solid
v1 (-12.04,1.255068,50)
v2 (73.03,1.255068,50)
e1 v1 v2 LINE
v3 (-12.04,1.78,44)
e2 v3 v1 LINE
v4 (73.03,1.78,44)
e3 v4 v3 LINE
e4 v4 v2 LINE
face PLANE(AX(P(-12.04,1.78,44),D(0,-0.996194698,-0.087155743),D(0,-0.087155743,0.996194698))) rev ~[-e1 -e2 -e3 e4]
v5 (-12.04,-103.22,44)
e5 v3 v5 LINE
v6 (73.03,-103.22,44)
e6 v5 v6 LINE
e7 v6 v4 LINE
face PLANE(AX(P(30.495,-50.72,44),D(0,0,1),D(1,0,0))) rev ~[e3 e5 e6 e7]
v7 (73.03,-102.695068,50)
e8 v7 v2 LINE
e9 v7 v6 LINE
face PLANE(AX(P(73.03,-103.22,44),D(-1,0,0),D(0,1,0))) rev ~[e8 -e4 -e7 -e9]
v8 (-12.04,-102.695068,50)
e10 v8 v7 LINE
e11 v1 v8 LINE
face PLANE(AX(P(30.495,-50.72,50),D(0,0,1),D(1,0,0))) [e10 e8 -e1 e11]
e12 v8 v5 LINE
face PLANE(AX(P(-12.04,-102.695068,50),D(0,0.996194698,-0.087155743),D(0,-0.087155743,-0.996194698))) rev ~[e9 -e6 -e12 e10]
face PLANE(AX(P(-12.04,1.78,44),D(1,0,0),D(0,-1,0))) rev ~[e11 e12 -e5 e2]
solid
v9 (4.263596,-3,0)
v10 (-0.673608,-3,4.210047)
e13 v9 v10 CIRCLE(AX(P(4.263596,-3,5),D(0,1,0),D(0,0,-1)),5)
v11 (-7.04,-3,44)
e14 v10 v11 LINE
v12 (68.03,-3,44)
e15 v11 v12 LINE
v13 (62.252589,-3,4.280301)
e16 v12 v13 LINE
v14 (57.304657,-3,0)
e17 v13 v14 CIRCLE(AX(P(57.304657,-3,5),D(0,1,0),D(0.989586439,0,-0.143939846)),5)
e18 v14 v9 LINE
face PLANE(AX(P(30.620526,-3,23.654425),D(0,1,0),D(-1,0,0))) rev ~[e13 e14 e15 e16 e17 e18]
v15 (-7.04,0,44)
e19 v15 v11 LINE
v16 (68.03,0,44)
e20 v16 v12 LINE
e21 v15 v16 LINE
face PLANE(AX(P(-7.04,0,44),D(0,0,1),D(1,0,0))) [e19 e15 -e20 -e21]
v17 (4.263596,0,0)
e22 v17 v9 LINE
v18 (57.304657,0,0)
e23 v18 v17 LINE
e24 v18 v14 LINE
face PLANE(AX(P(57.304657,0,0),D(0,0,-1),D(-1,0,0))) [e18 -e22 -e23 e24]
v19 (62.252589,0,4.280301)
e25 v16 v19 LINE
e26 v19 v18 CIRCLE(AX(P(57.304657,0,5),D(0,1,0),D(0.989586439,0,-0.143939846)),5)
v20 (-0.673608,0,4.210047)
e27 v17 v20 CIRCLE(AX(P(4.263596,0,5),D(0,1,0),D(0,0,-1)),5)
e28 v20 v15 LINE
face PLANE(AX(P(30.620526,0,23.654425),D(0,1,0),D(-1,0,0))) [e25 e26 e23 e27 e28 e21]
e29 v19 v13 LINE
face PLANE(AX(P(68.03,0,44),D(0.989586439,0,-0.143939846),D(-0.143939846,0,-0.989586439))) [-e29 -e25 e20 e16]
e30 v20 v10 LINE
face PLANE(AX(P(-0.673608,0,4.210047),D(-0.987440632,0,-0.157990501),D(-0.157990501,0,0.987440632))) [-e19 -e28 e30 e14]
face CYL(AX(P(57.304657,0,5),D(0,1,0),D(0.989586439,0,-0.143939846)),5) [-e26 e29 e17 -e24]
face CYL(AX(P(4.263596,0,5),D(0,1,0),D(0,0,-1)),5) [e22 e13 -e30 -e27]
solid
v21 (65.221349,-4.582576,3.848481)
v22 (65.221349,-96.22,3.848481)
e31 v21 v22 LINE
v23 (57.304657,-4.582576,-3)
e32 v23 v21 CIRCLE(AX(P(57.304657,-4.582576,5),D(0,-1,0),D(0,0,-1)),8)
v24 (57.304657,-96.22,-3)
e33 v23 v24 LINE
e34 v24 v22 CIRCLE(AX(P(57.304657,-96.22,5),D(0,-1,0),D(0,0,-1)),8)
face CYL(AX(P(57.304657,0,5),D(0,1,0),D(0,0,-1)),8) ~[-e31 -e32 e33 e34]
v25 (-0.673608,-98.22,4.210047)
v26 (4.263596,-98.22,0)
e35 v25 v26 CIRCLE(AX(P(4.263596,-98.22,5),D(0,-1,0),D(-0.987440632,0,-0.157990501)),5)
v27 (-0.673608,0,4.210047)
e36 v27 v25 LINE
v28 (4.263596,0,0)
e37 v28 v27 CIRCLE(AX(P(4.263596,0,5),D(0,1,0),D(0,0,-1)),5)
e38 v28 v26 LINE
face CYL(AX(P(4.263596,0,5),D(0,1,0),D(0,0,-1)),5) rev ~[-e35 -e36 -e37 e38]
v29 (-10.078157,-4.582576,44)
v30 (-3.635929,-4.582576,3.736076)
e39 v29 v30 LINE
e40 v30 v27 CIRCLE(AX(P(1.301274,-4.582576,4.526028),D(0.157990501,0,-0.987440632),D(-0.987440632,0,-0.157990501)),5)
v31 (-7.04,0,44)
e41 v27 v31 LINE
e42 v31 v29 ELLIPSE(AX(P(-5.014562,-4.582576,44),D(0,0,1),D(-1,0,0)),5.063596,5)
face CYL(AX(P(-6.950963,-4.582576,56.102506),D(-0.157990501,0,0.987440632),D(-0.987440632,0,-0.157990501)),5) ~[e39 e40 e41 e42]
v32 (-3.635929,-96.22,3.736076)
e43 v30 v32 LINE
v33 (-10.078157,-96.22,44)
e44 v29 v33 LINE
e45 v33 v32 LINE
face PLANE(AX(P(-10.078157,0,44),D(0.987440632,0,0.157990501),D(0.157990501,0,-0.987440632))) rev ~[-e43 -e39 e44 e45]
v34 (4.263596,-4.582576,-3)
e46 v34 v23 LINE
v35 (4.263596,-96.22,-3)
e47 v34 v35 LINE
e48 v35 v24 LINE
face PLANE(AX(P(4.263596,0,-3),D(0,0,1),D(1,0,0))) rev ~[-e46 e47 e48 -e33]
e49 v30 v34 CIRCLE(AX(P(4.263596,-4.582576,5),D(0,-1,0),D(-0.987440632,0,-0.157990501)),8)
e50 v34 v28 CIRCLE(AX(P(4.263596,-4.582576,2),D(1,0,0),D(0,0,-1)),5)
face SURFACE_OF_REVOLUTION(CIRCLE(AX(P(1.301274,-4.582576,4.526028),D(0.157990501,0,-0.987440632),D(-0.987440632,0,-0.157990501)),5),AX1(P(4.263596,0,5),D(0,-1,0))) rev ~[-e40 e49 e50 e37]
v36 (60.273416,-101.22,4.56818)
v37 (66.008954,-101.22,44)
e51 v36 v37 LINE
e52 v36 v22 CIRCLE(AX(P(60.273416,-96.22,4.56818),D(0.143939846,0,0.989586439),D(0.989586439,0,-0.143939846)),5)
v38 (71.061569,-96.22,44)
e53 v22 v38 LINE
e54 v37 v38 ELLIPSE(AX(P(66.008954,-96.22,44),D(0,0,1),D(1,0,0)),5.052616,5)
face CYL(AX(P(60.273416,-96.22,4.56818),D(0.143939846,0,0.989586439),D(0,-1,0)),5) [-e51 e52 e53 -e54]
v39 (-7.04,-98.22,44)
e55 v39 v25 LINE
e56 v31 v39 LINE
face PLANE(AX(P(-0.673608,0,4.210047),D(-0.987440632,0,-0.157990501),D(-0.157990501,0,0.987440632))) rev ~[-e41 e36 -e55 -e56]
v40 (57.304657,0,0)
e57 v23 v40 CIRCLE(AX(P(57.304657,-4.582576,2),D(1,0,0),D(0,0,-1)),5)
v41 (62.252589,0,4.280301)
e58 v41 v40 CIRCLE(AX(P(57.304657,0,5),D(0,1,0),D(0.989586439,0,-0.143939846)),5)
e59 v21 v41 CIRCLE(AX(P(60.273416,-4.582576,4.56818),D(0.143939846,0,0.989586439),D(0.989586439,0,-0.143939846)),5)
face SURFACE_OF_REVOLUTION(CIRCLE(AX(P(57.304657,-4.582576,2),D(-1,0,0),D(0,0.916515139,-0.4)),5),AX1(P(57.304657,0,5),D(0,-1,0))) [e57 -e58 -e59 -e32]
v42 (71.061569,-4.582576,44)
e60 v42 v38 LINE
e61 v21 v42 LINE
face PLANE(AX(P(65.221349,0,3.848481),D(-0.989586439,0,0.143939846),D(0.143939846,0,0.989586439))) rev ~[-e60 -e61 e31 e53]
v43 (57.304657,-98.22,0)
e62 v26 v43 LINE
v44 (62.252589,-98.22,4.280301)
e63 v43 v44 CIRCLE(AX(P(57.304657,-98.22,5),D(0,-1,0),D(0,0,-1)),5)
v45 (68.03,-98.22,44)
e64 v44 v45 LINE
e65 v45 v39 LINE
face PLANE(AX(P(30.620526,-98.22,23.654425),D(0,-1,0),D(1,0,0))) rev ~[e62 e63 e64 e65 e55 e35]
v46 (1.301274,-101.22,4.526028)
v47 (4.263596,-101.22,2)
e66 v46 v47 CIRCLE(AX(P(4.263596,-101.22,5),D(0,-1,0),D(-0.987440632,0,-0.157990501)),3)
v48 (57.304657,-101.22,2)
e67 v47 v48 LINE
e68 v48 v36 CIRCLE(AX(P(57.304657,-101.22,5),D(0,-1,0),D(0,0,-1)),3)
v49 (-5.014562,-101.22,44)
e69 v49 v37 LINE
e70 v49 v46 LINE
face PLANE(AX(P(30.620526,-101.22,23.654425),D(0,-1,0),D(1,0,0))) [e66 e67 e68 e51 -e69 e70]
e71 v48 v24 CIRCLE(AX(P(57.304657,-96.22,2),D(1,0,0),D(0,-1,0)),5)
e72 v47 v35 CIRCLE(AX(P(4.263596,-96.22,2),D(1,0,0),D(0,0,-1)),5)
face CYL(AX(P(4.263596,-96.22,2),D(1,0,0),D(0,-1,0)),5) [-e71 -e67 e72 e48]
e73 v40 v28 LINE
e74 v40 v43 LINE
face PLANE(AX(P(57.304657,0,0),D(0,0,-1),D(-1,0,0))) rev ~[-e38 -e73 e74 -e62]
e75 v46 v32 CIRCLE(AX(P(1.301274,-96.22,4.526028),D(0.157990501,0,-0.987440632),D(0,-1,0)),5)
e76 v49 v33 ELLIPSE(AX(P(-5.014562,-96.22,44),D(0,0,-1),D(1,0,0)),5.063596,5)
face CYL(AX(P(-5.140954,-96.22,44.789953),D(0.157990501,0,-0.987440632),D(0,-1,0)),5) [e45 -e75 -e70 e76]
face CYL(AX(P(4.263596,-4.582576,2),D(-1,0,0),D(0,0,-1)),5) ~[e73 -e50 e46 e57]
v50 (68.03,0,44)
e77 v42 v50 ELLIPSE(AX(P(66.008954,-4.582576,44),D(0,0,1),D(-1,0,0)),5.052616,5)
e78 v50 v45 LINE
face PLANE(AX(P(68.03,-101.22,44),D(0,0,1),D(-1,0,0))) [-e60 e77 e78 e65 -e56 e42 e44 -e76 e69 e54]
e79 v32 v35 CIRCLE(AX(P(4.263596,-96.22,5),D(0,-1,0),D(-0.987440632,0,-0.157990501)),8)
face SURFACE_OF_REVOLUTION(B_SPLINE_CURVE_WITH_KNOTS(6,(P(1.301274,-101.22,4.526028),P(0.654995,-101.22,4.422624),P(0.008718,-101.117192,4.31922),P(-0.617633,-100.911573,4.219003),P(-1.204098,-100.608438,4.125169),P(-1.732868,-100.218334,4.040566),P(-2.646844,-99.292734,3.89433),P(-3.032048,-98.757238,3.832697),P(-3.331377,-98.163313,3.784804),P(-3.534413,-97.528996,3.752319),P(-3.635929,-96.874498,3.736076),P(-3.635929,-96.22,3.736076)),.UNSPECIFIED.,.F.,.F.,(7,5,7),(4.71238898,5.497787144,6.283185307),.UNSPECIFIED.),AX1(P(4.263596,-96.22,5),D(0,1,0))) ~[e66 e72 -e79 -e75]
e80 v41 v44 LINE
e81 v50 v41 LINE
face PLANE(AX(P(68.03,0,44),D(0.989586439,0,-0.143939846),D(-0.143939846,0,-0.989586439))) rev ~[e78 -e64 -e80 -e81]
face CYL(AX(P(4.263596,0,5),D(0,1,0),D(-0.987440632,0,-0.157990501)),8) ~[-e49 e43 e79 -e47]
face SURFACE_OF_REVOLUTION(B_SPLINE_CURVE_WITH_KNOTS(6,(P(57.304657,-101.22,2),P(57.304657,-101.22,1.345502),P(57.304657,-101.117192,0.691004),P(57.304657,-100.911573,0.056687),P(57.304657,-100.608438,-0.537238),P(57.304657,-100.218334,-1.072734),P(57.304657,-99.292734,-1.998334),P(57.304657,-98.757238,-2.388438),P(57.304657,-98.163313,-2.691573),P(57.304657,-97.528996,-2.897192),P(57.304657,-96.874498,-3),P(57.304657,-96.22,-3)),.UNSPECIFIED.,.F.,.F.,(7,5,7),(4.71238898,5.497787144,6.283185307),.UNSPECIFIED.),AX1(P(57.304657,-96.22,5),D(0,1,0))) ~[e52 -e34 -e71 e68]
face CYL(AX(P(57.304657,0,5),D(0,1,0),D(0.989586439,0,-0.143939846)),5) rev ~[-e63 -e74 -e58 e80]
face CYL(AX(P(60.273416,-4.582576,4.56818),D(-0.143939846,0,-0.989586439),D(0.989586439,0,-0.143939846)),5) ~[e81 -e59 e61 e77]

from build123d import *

# Parameters (mm, degrees)
F1_DEPTH     = 101.22
F3_DEPTH     = 3
F5_DEPTH     = 3
F6_T1_DEPTH  = 52.0304782215
F6_T3_DEPTH  = 53.0410614462
F6_T5_DEPTH  = 52.232484609
F6_T8_ANGLE  = 81.7241071729
F6_T10_ANGLE = 80.9097230792
F7_R         = 5
F9_DEPTH     = 6
F11_DEPTH    = 111.14


# Not quite as in the source:
# - a fillet or chamfer that OpenCascade refuses, or shapes differently, is made with other operations: its cross-section is extruded or revolved along the edge and cut away or added


with BuildPart() as f1:
    # F0 (on Front) → F1 (new body)
    with BuildSketch(Plane.XZ):
        with BuildLine():
            Line((57.3046570067, 0), (4.2635955605, 0))
            ThreePointArc((4.2635955605, 0), (1.0193516214, 1.1954131284), (-0.6736075991, 4.2100474945))
            Line((-0.6736075991, 4.2100474945), (-7.04, 44))
            Line((-7.04, 44), (-10.0781573363, 44))
            Line((-10.0781573363, 44), (-3.6359294949, 3.7360759911))
            ThreePointArc((-3.6359294949, 3.7360759911), (-0.927194742, -1.0873389946), (4.2635955605, -3))
            Line((4.2635955605, -3), (57.3046570067, -3))
            ThreePointArc((57.3046570067, -3), (62.5385776153, -1.0502954525), (65.221348521, 3.8484812343))
            Line((65.221348521, 3.8484812343), (71.0615694323, 44))
            Line((71.0615694323, 44), (68.03, 44))
            Line((68.03, 44), (62.2525892031, 4.2803007714))
            ThreePointArc((62.2525892031, 4.2803007714), (60.5758573871, 1.2185653422), (57.3046570067, 0))
        make_face()
    extrude(amount=F1_DEPTH)

    # F2 (on face) → F3 (join)
    with BuildSketch(Plane.XZ.offset(101.22)):
        with BuildLine():
            Line((68.03, 44), (-7.04, 44))
            Line((-7.04, 44), (-0.6736075991, 4.2100474945))
            ThreePointArc((-0.6736075991, 4.2100474945), (1.0193516214, 1.1954131284), (4.2635955605, 0))
            Line((4.2635955605, 0), (57.3046570067, 0))
            ThreePointArc((57.3046570067, 0), (60.5758573871, 1.2185653422), (62.2525892031, 4.2803007714))
            Line((62.2525892031, 4.2803007714), (68.03, 44))
        make_face()
    extrude(amount=-F3_DEPTH)

    # F6: fillet of radius 5 on 1 edges, made by hand

    # F6_s2 → F6_t1 (cut)
    with BuildSketch(Plane(origin=(1.8994814012, 0, 13.0589346335), x_dir=(0, 1, 0), z_dir=(0.1439398457, 0, 0.9895864393))):
        with BuildLine():
            ThreePointArc((-4.582575695, -63.9882122531), (-1.8439629074, -63.1715123858), (0, -60.9882122531))
            Line((0, -60.9882122531), (0, -63.9882122531))
            Line((0, -63.9882122531), (-4.582575695, -63.9882122531))
        make_face()
    extrude(amount=F6_T1_DEPTH, mode=Mode.SUBTRACT)

    # F6_s4 → F6_t3 (cut)
    with BuildSketch(Plane.YZ.offset(4.2635955605)):
        with BuildLine():
            ThreePointArc((-4.582575695, -3), (-1.8439629074, -2.1833001327), (0, 0))
            Line((0, 0), (0, -3))
            Line((0, -3), (-4.582575695, -3))
        make_face()
    extrude(amount=F6_T3_DEPTH, mode=Mode.SUBTRACT)

    # F6_s6 → F6_t5 (cut)
    with BuildSketch(Plane(origin=(-8.9258440165, 0, 55.7865251034), x_dir=(0, 1, 0), z_dir=(0.1579905011, 0, -0.9874406319))):
        with BuildLine():
            ThreePointArc((-4.582575695, -3), (-1.8439629074, -2.1833001327), (0, 0))
            Line((0, 0), (0, -3))
            Line((0, -3), (-4.582575695, -3))
        make_face()
    extrude(amount=F6_T5_DEPTH, mode=Mode.SUBTRACT)

    # F6_s7 → F6_t8 (revolve, cut)
    with BuildSketch(Plane.YZ.offset(57.3046570067)):
        with BuildLine():
            ThreePointArc((0, 0), (-1.8439629074, -2.1833001327), (-4.582575695, -3))
            Line((-4.582575695, -3), (0, -3))
            Line((0, -3), (0, 0))
        make_face()
    revolve(axis=Axis((57.3046570067, 0, 5), (0, -1, 0)), revolution_arc=F6_T8_ANGLE, mode=Mode.SUBTRACT)

    # F6_s9 → F6_t10 (revolve, cut)
    with BuildSketch(Plane(origin=(-0.6736075991, 0, 4.2100474945), x_dir=(0, 1, 0), z_dir=(-0.1579905011, 0, 0.9874406319))):
        with BuildLine():
            ThreePointArc((-4.582575695, 3), (-1.8439629074, 2.1833001327), (0, 0))
            Line((0, 0), (0, 3))
            Line((0, 3), (-4.582575695, 3))
        make_face()
    revolve(axis=Axis((4.2635955605, 0, 5), (0, -1, 0)), revolution_arc=F6_T10_ANGLE, mode=Mode.SUBTRACT)

    # F7
    f7_edges = [f1.edges().sort_by_distance(p)[0] for p in [
        (-6.857043, -101.22, 23.868038),
        (68.141459, -101.22, 23.924241),
        (-0.927195, -101.22, -1.087339),
        (30.784126, -101.22, -3),
        (62.538578, -101.22, -1.050295),
    ]]
    fillet(f7_edges, radius=F7_R)


with BuildPart() as f5:
    # F4 (on face) → F5 (new body)
    with BuildSketch(Plane(origin=(0, 0, 0), x_dir=(-1, 0, 0), z_dir=(0, 1, 0))):
        with BuildLine():
            ThreePointArc((-4.2635955605, 0), (-1.0193516214, 1.1954131284), (0.6736075991, 4.2100474945))
            Line((0.6736075991, 4.2100474945), (7.04, 44))
            Line((7.04, 44), (-68.03, 44))
            Line((-68.03, 44), (-62.2525892031, 4.2803007714))
            ThreePointArc((-62.2525892031, 4.2803007714), (-60.5758573871, 1.2185653422), (-57.3046570067, 0))
            Line((-57.3046570067, 0), (-4.2635955605, 0))
        make_face()
    extrude(amount=-F5_DEPTH)


with BuildPart() as f9:
    # F8 (on face) → F9 (new body)
    with BuildSketch(Plane.XY.offset(44)):
        Polygon((-12.04, 1.78), (-12.04, -98.22), (-12.04, -103.22), (73.03, -103.22), (73.03, -98.22), (73.03, -3.22), (73.03, 1.78), align=None)
    extrude(amount=F9_DEPTH)

    # F10 (on face) → F11 (cut)
    with BuildSketch(Plane(origin=(-12.04, 0, 0), x_dir=(0, -1, 0), z_dir=(-1, 0, 0))):
        Polygon((102.6950680188, 50), (103.22, 44), (103.22, 50), align=None)
        Polygon((-1.78, 50), (-1.78, 44), (-1.2550680188, 50), align=None)
    extrude(amount=-F11_DEPTH, mode=Mode.SUBTRACT)


solid = Compound([f1.part, f5.part, f9.part])
